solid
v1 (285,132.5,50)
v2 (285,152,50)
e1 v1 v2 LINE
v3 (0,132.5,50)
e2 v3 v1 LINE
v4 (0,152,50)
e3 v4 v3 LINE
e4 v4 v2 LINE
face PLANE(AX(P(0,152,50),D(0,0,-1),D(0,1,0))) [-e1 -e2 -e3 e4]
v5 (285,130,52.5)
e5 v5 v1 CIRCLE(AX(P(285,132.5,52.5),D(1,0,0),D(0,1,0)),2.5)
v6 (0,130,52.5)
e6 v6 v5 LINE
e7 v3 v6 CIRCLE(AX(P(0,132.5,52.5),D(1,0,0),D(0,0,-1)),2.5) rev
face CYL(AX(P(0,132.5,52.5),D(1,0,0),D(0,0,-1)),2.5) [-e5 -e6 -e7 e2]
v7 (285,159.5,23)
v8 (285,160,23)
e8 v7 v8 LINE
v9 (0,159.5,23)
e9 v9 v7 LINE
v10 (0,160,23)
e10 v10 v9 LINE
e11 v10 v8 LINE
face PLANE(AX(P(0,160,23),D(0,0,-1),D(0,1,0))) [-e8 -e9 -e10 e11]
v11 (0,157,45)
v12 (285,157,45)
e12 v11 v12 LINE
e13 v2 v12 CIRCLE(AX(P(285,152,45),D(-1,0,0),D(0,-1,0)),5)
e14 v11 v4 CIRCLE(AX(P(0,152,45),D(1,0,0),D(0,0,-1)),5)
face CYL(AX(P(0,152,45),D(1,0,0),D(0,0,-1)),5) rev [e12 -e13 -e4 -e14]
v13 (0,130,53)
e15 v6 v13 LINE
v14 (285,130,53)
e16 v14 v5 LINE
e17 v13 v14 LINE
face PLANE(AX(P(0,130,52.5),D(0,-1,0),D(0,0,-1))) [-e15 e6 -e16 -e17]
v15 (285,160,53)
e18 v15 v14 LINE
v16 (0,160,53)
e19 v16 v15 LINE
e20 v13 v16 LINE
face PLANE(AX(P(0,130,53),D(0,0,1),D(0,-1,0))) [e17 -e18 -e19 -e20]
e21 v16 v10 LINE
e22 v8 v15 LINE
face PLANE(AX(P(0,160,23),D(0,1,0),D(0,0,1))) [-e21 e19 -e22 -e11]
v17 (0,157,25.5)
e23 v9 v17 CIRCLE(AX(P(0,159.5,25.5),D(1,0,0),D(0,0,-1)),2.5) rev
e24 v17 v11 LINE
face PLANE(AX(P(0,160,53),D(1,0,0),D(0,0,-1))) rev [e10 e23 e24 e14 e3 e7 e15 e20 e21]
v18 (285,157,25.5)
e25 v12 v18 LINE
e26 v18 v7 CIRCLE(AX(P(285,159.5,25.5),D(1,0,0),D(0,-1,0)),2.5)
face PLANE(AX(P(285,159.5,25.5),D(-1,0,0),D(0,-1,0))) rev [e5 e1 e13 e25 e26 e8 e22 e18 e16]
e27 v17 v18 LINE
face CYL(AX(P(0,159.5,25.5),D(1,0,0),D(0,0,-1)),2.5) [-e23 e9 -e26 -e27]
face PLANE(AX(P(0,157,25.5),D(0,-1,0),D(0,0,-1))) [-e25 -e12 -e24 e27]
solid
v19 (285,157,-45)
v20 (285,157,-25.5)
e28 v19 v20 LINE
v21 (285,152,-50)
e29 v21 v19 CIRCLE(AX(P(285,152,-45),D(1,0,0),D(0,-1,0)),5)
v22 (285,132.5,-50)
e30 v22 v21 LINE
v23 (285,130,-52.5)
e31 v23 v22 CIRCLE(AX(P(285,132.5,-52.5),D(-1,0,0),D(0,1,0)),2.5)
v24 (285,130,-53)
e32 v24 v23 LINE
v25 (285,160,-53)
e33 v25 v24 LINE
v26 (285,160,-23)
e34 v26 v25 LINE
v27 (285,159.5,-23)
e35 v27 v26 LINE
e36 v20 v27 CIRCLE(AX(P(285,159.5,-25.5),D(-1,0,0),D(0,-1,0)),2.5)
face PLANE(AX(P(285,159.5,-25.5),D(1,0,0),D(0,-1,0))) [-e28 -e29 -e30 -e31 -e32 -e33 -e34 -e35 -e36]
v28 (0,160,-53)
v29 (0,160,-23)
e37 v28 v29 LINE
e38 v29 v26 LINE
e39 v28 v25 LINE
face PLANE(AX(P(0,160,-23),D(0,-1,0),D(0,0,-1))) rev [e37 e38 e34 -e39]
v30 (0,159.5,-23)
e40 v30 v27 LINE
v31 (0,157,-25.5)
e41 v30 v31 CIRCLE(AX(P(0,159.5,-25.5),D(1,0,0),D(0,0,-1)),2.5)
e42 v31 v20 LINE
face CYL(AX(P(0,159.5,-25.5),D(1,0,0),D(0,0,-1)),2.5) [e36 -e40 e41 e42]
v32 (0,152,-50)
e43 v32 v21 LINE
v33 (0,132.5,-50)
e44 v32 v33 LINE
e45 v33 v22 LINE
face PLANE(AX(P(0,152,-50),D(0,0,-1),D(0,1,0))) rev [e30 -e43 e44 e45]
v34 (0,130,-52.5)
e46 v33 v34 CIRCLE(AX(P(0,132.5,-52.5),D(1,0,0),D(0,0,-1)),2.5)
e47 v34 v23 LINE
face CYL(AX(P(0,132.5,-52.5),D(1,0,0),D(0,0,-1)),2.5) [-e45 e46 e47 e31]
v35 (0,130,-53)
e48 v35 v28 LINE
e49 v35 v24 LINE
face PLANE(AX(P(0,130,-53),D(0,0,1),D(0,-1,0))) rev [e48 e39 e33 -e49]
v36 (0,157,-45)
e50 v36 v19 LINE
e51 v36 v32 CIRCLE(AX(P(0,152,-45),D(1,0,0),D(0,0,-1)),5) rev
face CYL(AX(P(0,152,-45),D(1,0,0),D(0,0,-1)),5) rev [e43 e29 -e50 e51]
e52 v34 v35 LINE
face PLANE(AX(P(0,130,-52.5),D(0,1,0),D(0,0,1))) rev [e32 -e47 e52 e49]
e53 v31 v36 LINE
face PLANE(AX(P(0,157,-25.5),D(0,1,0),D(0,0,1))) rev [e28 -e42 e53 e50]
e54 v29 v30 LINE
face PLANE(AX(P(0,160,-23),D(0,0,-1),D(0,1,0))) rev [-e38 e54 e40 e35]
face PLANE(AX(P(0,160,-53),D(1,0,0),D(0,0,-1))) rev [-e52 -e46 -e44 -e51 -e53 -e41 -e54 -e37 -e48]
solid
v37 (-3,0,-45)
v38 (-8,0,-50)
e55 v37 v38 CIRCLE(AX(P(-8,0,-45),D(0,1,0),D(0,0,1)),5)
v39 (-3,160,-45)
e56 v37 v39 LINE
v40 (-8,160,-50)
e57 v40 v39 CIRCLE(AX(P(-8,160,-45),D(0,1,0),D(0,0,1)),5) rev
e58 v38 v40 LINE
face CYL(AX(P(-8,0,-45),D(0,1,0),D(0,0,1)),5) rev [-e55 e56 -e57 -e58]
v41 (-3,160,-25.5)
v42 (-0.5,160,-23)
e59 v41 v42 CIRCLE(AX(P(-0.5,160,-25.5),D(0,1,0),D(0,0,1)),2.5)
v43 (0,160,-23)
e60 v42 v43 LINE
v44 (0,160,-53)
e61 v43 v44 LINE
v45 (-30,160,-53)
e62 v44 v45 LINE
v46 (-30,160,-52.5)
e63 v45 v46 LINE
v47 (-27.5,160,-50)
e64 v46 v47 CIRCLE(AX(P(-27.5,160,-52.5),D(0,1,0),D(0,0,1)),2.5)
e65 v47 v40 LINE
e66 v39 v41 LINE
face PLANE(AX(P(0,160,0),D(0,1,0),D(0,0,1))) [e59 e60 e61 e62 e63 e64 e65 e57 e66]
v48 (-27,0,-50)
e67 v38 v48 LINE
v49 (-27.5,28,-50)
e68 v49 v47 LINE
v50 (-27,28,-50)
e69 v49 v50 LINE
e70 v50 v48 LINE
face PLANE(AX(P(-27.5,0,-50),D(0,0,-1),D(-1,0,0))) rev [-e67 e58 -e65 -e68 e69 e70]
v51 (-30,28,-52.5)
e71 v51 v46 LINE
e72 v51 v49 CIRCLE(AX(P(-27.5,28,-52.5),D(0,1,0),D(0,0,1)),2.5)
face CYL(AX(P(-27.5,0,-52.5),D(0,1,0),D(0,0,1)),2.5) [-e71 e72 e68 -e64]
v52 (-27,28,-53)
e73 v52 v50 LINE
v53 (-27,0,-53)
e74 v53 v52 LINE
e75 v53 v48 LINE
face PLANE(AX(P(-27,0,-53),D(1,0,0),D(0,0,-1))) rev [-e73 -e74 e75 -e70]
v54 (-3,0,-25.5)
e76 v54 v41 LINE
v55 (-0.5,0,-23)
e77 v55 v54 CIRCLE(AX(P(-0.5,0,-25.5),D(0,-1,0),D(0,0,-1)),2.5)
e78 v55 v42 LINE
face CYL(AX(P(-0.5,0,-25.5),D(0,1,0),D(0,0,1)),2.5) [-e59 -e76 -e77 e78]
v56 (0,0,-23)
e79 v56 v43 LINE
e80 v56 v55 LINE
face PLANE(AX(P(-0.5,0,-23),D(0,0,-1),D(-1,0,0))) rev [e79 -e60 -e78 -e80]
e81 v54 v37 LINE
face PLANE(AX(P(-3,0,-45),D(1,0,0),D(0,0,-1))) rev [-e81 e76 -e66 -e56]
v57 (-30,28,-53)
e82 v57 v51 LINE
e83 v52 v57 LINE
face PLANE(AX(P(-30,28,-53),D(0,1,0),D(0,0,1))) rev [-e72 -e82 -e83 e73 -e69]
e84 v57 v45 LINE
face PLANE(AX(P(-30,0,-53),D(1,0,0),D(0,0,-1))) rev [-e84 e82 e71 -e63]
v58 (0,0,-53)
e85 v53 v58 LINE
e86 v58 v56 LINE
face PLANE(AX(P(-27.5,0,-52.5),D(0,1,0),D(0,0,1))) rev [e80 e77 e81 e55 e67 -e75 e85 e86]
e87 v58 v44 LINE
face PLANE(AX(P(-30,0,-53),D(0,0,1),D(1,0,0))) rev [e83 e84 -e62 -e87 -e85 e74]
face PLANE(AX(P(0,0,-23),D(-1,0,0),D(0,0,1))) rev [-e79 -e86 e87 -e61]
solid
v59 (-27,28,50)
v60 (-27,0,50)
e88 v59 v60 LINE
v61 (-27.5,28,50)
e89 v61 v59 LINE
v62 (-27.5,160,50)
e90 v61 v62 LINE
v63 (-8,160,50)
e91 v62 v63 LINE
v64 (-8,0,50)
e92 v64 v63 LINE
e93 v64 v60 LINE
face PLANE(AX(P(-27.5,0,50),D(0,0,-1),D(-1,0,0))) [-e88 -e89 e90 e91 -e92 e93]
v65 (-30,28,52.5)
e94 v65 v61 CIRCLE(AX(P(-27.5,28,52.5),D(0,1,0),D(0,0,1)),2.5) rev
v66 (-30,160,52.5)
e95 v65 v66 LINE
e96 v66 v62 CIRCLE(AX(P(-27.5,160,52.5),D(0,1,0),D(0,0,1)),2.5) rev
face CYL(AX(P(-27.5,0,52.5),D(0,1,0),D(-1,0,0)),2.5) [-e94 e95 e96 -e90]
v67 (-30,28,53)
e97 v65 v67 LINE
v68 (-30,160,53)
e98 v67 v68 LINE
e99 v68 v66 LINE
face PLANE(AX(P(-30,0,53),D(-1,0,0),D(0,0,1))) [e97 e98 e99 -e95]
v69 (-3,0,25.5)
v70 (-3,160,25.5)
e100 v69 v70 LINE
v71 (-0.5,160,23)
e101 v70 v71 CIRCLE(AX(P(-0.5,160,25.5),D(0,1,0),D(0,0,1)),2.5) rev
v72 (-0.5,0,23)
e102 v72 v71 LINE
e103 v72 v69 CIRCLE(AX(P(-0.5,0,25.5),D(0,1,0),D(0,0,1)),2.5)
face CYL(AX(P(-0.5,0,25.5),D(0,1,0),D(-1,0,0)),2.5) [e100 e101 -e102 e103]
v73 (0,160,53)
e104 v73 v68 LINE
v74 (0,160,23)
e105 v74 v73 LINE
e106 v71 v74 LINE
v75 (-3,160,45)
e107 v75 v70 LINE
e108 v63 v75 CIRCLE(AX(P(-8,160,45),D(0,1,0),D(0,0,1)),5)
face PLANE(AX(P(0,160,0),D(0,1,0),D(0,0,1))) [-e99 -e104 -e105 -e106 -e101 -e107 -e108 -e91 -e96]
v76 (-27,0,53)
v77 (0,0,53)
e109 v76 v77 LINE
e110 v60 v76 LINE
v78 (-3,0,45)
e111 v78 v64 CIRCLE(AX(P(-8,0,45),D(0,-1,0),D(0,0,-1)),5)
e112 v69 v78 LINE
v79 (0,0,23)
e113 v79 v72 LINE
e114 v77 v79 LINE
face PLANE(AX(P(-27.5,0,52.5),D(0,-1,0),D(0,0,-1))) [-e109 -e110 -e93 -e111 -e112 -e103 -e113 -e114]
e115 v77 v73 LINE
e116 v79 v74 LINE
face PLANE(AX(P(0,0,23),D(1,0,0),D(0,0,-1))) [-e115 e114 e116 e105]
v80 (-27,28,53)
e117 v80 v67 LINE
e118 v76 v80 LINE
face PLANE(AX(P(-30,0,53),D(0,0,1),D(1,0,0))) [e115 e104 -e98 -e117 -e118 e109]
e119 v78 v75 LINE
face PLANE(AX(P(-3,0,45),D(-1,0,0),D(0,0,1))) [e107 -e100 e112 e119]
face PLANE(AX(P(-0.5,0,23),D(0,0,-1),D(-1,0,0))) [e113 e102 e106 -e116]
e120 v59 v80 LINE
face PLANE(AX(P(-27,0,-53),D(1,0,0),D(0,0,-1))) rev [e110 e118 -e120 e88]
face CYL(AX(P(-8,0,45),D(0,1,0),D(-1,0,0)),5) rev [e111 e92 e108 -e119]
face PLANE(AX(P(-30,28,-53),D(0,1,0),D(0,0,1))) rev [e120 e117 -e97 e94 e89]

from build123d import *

# Parameters (mm, degrees)
DIN_L_ANGLE_L30X30X3_1_DEPTH   = 285
DIN_L_ANGLE_L30X30X3_1_2_DEPTH = 160
CUT_EXTRUDE1_DEPTH             = 344.600058207
CUT_EXTRUDE1_DEPTH_BACK        = 344.600058207
SKETCH2_W                      = 3
SKETCH2_H                      = 28


# Read off the part's stored shape, not the designer's step: <DIN><l angle><L30x30x3>(1)
with BuildPart() as part:
    # <DIN><l angle><L30x30x3>(1) outline → <DIN><l angle><L30x30x3>(1) (new body)
    with BuildSketch(Plane.YZ):
        with BuildLine():
            Line((130, -53), (160, -53))
            Line((160, -53), (160, -23))
            Line((160, -23), (159.5, -23))
            ThreePointArc((159.5, -23), (157.732233047, -23.732233047), (157, -25.5))
            Line((157, -25.5), (157, -45))
            ThreePointArc((157, -45), (155.535533906, -48.535533906), (152, -50))
            Line((152, -50), (132.5, -50))
            ThreePointArc((132.5, -50), (130.732233047, -50.732233047), (130, -52.5))
            Line((130, -52.5), (130, -53))
        make_face()
        with BuildLine():
            Line((160, 23), (160, 53))
            Line((160, 53), (130, 53))
            Line((130, 53), (130, 52.5))
            ThreePointArc((130, 52.5), (130.732233047, 50.732233047), (132.5, 50))
            Line((132.5, 50), (152, 50))
            ThreePointArc((152, 50), (155.535533906, 48.535533906), (157, 45))
            Line((157, 45), (157, 25.5))
            ThreePointArc((157, 25.5), (157.732233047, 23.732233047), (159.5, 23))
            Line((159.5, 23), (160, 23))
        make_face()
    extrude(amount=DIN_L_ANGLE_L30X30X3_1_DEPTH)


with BuildPart() as body_2:
    # DIN_l angle_L30x30x3_1 2 outline → DIN_l angle_L30x30x3_1 2 (new body)
    with BuildSketch(Plane(origin=(0, 0, 0), x_dir=(1, 0, 0), z_dir=(0, 1, 0))):
        with BuildLine():
            Line((0, 23), (0, 53))
            Line((0, 53), (-30, 53))
            Line((-30, 53), (-30, 52.5))
            ThreePointArc((-30, 52.5), (-29.267766953, 50.732233047), (-27.5, 50))
            Line((-27.5, 50), (-8, 50))
            ThreePointArc((-8, 50), (-4.464466094, 48.535533906), (-3, 45))
            Line((-3, 45), (-3, 25.5))
            ThreePointArc((-3, 25.5), (-2.267766953, 23.732233047), (-0.5, 23))
            Line((-0.5, 23), (0, 23))
        make_face()
        with BuildLine():
            Line((-30, -53), (0, -53))
            Line((0, -53), (0, -23))
            Line((0, -23), (-0.5, -23))
            ThreePointArc((-0.5, -23), (-2.267766953, -23.732233047), (-3, -25.5))
            Line((-3, -25.5), (-3, -45))
            ThreePointArc((-3, -45), (-4.464466094, -48.535533906), (-8, -50))
            Line((-8, -50), (-27.5, -50))
            ThreePointArc((-27.5, -50), (-29.267766953, -50.732233047), (-30, -52.5))
            Line((-30, -52.5), (-30, -53))
        make_face()
    extrude(amount=DIN_L_ANGLE_L30X30X3_1_2_DEPTH)

    # Sketch2 → Cut-Extrude1 (cut, two sides: drawn at the far end of the back side and taken through both)
    with BuildSketch(Plane.XY.offset(53).offset(-CUT_EXTRUDE1_DEPTH_BACK)):
        with Locations((-28.5, 14)):
            Rectangle(SKETCH2_W, SKETCH2_H)
    extrude(amount=CUT_EXTRUDE1_DEPTH + CUT_EXTRUDE1_DEPTH_BACK, mode=Mode.SUBTRACT)


solid = Compound([part.part, body_2.part])
